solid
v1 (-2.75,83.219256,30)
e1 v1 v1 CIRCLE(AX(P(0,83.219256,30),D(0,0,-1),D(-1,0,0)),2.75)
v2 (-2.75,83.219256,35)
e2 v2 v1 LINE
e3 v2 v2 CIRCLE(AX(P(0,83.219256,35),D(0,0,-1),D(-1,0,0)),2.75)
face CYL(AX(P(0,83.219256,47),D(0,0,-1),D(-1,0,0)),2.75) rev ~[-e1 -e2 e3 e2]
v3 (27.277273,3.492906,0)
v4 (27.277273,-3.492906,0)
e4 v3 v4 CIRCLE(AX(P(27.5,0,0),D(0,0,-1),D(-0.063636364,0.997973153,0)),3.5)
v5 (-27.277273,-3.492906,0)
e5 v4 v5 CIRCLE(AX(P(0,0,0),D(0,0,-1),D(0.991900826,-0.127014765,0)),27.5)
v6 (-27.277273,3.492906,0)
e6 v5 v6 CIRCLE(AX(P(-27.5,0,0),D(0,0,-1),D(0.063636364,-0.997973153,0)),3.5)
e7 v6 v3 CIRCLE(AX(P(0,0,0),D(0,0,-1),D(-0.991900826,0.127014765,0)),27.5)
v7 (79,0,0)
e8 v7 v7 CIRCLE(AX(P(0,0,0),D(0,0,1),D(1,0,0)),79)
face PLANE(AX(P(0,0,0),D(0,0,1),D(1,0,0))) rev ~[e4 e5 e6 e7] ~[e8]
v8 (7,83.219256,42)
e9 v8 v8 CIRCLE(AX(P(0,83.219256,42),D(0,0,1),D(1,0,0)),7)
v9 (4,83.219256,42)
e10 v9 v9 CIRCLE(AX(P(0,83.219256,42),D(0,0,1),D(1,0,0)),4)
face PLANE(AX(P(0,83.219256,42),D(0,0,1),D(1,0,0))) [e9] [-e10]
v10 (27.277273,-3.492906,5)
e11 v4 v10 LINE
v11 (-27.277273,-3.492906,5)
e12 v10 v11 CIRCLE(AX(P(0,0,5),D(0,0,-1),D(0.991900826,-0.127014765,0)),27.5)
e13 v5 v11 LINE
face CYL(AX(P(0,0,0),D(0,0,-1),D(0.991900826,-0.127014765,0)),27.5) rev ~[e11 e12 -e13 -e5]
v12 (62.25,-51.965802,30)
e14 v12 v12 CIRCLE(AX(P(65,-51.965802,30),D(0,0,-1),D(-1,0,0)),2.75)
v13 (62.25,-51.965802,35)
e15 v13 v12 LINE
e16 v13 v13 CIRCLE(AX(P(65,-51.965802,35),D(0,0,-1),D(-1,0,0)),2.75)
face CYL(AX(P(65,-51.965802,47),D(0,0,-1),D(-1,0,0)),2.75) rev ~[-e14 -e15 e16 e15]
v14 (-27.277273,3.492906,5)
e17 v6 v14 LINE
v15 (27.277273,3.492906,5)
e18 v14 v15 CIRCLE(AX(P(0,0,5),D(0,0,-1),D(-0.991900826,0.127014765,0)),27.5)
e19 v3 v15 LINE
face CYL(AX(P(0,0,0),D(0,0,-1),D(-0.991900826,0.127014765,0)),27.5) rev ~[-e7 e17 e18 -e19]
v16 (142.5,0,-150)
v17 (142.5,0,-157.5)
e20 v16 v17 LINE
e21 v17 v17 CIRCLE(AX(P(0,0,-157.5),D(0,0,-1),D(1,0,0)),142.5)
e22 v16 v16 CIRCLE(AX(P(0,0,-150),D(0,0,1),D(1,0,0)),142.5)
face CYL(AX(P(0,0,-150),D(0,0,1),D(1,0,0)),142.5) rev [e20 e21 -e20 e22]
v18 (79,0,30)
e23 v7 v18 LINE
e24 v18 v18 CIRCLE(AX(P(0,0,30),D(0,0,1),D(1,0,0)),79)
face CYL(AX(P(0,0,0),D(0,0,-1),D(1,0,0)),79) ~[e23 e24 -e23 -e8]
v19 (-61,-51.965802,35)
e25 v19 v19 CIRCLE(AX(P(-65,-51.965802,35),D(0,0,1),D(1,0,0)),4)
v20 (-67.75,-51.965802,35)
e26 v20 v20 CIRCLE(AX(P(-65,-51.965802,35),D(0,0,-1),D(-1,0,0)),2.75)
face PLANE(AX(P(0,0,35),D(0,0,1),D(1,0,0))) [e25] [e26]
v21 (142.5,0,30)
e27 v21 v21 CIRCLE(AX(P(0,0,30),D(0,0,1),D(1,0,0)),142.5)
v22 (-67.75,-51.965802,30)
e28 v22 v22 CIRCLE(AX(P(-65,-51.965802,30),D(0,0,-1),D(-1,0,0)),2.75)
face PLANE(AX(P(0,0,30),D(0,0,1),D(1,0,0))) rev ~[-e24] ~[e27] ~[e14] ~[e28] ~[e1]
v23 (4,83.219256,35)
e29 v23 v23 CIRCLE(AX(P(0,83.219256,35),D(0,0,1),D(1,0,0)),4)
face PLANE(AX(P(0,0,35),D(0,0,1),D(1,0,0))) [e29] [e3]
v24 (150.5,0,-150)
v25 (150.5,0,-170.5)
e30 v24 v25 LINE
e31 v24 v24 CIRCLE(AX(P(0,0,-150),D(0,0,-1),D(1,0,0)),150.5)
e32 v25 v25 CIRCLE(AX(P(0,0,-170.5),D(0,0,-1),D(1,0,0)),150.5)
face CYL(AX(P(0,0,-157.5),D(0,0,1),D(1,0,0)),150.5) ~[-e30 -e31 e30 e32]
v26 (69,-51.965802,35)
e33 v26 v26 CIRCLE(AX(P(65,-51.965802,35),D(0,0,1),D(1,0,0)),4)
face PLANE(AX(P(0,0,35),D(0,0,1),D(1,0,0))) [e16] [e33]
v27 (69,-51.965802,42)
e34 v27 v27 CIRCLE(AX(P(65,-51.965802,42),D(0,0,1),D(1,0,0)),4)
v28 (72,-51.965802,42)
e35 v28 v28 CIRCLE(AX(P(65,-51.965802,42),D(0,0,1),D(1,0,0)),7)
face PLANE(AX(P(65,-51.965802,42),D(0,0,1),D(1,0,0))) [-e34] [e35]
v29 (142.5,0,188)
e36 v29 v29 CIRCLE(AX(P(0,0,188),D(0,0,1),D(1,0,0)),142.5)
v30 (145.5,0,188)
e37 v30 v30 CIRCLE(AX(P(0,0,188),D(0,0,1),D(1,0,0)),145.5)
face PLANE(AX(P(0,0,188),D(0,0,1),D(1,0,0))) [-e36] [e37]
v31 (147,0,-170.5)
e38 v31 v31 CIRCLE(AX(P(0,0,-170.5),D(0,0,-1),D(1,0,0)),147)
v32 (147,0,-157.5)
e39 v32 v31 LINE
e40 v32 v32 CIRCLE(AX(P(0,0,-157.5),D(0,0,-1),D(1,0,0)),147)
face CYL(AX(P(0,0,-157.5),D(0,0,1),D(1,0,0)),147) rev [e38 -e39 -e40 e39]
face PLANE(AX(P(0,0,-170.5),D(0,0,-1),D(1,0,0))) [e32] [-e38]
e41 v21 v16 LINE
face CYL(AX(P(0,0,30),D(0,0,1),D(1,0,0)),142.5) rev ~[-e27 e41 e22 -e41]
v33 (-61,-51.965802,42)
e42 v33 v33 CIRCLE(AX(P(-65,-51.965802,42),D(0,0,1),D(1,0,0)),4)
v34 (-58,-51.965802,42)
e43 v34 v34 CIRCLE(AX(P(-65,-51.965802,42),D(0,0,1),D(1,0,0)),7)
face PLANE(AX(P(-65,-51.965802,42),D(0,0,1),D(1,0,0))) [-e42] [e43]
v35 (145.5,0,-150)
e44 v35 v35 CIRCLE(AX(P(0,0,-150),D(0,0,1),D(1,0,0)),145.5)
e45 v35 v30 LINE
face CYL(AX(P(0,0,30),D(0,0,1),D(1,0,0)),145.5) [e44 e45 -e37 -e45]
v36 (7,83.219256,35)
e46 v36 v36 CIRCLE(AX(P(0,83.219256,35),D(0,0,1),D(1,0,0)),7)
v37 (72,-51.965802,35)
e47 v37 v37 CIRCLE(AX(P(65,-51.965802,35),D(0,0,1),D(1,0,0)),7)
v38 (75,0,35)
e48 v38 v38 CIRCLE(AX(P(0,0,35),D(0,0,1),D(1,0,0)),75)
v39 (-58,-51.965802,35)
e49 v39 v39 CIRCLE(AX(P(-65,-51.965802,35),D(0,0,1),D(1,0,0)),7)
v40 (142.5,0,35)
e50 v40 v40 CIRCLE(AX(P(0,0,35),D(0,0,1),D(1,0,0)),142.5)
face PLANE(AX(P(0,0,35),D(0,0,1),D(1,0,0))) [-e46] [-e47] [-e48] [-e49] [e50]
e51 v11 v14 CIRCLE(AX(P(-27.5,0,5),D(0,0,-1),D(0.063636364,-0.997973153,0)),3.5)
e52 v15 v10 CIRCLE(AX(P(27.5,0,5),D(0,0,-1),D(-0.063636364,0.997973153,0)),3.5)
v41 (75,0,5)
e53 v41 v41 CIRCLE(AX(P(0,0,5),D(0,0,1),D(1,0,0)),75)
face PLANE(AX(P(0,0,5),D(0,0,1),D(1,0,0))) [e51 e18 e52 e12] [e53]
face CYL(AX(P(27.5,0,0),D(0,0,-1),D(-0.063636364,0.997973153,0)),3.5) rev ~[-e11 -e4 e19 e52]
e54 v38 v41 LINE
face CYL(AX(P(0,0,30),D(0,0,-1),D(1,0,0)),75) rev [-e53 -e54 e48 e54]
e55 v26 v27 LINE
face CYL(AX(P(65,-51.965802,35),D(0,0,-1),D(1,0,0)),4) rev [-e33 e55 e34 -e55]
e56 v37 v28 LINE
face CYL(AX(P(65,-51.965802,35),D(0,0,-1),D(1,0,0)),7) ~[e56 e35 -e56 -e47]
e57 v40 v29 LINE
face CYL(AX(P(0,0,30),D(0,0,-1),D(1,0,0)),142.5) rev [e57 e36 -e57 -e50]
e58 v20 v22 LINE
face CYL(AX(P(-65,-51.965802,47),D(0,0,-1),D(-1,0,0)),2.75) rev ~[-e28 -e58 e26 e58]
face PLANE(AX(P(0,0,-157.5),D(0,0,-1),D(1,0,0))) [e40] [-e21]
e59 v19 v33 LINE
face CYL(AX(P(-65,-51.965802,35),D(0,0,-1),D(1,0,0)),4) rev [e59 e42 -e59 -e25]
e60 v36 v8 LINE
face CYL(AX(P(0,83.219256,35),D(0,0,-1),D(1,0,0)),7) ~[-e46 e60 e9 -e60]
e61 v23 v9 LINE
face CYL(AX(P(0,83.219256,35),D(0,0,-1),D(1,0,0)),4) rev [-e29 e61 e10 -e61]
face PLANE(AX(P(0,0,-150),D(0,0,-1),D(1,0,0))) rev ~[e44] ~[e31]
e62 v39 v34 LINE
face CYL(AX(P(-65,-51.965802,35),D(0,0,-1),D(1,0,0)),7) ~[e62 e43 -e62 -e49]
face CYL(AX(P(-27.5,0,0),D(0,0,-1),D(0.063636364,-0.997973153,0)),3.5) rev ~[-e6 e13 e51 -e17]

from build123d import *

# Parameters (mm, degrees)
F0_R      = 75
F1_DEPTH  = 5
F0_R_2    = 79
F2_DEPTH  = 30
F3_R      = 142.5
F3_R_2    = 79
F3_R_3    = 75
F4_DEPTH  = 5
F3_R_4    = 145.5
F5_DEPTH  = 158
F6_DEPTH  = 180
F7_R      = 150.5
F7_R_2    = 145.5
F7_R_3    = 142.5
F8_DEPTH  = 7.5
F9_R      = 150.5
F9_R_2    = 147
F10_DEPTH = 13
F11_R     = 7
F11_R_2   = 4
F12_DEPTH = 7
F13_D     = 5.5
F13_DEPTH = 12
F13_TIP   = 1.6523667023


with BuildPart() as f1:
    # F0 (on Top) → F1 (new body)
    with BuildSketch(Plane.XY):
        Circle(F0_R)
        with BuildLine():
            ThreePointArc((-27.2772727273, 3.4929060339), (0, 27.5), (27.2772727273, 3.4929060339))
            ThreePointArc((27.2772727273, 3.4929060339), (31, 0), (27.2772727273, -3.4929060339))
            ThreePointArc((27.2772727273, -3.4929060339), (0, -27.5), (-27.2772727273, -3.4929060339))
            ThreePointArc((-27.2772727273, -3.4929060339), (-31, 0), (-27.2772727273, 3.4929060339))
        make_face(mode=Mode.SUBTRACT)
    extrude(amount=F1_DEPTH)

    # F0 (on Top) → F2 (join)
    with BuildSketch(Plane.XY):
        Circle(F0_R_2)
        Circle(F0_R, mode=Mode.SUBTRACT)
    extrude(amount=F2_DEPTH)

    # F3 (on face) → F4 (join)
    with BuildSketch(Plane.XY.offset(30)):
        Circle(F3_R)
        Circle(F3_R_2, mode=Mode.SUBTRACT)
        Circle(F3_R_2)
        Circle(F3_R_3, mode=Mode.SUBTRACT)
    extrude(amount=F4_DEPTH)

    # F3 (on face) → F5 (join)
    with BuildSketch(Plane.XY.offset(30)):
        Circle(F3_R_4)
        Circle(F3_R, mode=Mode.SUBTRACT)
    extrude(amount=F5_DEPTH)

    # F3 (on face) → F6 (join)
    with BuildSketch(Plane.XY.offset(30)):
        Circle(F3_R_4)
        Circle(F3_R, mode=Mode.SUBTRACT)
    extrude(amount=-F6_DEPTH)

    # F7 (on face) → F8 (join)
    with BuildSketch(Plane(origin=(0, 0, -150), x_dir=(1, 0, 0), z_dir=(0, 0, -1))):
        Circle(F7_R)
        Circle(F7_R_2, mode=Mode.SUBTRACT)
        Circle(F7_R_2)
        Circle(F7_R_3, mode=Mode.SUBTRACT)
    extrude(amount=F8_DEPTH)

    # F9 (on face) → F10 (join)
    with BuildSketch(Plane(origin=(0, 0, -157.5), x_dir=(1, 0, 0), z_dir=(0, 0, -1))):
        Circle(F9_R)
        Circle(F9_R_2, mode=Mode.SUBTRACT)
    extrude(amount=F10_DEPTH)

    # F11 (on face) → F12 (join)
    with BuildSketch(Plane.XY.offset(35)):
        with Locations((0, 83.2192561637)):
            Circle(F11_R)
        with Locations((0, 83.2192561637)):
            Circle(F11_R_2, mode=Mode.SUBTRACT)
        with Locations((-65, -51.9658021822)):
            Circle(F11_R)
        with Locations((-65, -51.9658021822)):
            Circle(F11_R_2, mode=Mode.SUBTRACT)
        with Locations((65, -51.9658021822)):
            Circle(F11_R)
        with Locations((65, -51.9658021822)):
            Circle(F11_R_2, mode=Mode.SUBTRACT)
    extrude(amount=F12_DEPTH)

    # F13
    with Locations(Plane.XY.offset(35)):
        with Locations((0, 83.2192561637), (-65, -51.9658021822), (65, -51.9658021822)):
            Hole(F13_D / 2, depth=F13_DEPTH)
            with Locations((0, 0, -(F13_DEPTH + F13_TIP / 2))):  # 118° drill point
                Cone(0, F13_D / 2, F13_TIP, mode=Mode.SUBTRACT)


solid = f1.part
